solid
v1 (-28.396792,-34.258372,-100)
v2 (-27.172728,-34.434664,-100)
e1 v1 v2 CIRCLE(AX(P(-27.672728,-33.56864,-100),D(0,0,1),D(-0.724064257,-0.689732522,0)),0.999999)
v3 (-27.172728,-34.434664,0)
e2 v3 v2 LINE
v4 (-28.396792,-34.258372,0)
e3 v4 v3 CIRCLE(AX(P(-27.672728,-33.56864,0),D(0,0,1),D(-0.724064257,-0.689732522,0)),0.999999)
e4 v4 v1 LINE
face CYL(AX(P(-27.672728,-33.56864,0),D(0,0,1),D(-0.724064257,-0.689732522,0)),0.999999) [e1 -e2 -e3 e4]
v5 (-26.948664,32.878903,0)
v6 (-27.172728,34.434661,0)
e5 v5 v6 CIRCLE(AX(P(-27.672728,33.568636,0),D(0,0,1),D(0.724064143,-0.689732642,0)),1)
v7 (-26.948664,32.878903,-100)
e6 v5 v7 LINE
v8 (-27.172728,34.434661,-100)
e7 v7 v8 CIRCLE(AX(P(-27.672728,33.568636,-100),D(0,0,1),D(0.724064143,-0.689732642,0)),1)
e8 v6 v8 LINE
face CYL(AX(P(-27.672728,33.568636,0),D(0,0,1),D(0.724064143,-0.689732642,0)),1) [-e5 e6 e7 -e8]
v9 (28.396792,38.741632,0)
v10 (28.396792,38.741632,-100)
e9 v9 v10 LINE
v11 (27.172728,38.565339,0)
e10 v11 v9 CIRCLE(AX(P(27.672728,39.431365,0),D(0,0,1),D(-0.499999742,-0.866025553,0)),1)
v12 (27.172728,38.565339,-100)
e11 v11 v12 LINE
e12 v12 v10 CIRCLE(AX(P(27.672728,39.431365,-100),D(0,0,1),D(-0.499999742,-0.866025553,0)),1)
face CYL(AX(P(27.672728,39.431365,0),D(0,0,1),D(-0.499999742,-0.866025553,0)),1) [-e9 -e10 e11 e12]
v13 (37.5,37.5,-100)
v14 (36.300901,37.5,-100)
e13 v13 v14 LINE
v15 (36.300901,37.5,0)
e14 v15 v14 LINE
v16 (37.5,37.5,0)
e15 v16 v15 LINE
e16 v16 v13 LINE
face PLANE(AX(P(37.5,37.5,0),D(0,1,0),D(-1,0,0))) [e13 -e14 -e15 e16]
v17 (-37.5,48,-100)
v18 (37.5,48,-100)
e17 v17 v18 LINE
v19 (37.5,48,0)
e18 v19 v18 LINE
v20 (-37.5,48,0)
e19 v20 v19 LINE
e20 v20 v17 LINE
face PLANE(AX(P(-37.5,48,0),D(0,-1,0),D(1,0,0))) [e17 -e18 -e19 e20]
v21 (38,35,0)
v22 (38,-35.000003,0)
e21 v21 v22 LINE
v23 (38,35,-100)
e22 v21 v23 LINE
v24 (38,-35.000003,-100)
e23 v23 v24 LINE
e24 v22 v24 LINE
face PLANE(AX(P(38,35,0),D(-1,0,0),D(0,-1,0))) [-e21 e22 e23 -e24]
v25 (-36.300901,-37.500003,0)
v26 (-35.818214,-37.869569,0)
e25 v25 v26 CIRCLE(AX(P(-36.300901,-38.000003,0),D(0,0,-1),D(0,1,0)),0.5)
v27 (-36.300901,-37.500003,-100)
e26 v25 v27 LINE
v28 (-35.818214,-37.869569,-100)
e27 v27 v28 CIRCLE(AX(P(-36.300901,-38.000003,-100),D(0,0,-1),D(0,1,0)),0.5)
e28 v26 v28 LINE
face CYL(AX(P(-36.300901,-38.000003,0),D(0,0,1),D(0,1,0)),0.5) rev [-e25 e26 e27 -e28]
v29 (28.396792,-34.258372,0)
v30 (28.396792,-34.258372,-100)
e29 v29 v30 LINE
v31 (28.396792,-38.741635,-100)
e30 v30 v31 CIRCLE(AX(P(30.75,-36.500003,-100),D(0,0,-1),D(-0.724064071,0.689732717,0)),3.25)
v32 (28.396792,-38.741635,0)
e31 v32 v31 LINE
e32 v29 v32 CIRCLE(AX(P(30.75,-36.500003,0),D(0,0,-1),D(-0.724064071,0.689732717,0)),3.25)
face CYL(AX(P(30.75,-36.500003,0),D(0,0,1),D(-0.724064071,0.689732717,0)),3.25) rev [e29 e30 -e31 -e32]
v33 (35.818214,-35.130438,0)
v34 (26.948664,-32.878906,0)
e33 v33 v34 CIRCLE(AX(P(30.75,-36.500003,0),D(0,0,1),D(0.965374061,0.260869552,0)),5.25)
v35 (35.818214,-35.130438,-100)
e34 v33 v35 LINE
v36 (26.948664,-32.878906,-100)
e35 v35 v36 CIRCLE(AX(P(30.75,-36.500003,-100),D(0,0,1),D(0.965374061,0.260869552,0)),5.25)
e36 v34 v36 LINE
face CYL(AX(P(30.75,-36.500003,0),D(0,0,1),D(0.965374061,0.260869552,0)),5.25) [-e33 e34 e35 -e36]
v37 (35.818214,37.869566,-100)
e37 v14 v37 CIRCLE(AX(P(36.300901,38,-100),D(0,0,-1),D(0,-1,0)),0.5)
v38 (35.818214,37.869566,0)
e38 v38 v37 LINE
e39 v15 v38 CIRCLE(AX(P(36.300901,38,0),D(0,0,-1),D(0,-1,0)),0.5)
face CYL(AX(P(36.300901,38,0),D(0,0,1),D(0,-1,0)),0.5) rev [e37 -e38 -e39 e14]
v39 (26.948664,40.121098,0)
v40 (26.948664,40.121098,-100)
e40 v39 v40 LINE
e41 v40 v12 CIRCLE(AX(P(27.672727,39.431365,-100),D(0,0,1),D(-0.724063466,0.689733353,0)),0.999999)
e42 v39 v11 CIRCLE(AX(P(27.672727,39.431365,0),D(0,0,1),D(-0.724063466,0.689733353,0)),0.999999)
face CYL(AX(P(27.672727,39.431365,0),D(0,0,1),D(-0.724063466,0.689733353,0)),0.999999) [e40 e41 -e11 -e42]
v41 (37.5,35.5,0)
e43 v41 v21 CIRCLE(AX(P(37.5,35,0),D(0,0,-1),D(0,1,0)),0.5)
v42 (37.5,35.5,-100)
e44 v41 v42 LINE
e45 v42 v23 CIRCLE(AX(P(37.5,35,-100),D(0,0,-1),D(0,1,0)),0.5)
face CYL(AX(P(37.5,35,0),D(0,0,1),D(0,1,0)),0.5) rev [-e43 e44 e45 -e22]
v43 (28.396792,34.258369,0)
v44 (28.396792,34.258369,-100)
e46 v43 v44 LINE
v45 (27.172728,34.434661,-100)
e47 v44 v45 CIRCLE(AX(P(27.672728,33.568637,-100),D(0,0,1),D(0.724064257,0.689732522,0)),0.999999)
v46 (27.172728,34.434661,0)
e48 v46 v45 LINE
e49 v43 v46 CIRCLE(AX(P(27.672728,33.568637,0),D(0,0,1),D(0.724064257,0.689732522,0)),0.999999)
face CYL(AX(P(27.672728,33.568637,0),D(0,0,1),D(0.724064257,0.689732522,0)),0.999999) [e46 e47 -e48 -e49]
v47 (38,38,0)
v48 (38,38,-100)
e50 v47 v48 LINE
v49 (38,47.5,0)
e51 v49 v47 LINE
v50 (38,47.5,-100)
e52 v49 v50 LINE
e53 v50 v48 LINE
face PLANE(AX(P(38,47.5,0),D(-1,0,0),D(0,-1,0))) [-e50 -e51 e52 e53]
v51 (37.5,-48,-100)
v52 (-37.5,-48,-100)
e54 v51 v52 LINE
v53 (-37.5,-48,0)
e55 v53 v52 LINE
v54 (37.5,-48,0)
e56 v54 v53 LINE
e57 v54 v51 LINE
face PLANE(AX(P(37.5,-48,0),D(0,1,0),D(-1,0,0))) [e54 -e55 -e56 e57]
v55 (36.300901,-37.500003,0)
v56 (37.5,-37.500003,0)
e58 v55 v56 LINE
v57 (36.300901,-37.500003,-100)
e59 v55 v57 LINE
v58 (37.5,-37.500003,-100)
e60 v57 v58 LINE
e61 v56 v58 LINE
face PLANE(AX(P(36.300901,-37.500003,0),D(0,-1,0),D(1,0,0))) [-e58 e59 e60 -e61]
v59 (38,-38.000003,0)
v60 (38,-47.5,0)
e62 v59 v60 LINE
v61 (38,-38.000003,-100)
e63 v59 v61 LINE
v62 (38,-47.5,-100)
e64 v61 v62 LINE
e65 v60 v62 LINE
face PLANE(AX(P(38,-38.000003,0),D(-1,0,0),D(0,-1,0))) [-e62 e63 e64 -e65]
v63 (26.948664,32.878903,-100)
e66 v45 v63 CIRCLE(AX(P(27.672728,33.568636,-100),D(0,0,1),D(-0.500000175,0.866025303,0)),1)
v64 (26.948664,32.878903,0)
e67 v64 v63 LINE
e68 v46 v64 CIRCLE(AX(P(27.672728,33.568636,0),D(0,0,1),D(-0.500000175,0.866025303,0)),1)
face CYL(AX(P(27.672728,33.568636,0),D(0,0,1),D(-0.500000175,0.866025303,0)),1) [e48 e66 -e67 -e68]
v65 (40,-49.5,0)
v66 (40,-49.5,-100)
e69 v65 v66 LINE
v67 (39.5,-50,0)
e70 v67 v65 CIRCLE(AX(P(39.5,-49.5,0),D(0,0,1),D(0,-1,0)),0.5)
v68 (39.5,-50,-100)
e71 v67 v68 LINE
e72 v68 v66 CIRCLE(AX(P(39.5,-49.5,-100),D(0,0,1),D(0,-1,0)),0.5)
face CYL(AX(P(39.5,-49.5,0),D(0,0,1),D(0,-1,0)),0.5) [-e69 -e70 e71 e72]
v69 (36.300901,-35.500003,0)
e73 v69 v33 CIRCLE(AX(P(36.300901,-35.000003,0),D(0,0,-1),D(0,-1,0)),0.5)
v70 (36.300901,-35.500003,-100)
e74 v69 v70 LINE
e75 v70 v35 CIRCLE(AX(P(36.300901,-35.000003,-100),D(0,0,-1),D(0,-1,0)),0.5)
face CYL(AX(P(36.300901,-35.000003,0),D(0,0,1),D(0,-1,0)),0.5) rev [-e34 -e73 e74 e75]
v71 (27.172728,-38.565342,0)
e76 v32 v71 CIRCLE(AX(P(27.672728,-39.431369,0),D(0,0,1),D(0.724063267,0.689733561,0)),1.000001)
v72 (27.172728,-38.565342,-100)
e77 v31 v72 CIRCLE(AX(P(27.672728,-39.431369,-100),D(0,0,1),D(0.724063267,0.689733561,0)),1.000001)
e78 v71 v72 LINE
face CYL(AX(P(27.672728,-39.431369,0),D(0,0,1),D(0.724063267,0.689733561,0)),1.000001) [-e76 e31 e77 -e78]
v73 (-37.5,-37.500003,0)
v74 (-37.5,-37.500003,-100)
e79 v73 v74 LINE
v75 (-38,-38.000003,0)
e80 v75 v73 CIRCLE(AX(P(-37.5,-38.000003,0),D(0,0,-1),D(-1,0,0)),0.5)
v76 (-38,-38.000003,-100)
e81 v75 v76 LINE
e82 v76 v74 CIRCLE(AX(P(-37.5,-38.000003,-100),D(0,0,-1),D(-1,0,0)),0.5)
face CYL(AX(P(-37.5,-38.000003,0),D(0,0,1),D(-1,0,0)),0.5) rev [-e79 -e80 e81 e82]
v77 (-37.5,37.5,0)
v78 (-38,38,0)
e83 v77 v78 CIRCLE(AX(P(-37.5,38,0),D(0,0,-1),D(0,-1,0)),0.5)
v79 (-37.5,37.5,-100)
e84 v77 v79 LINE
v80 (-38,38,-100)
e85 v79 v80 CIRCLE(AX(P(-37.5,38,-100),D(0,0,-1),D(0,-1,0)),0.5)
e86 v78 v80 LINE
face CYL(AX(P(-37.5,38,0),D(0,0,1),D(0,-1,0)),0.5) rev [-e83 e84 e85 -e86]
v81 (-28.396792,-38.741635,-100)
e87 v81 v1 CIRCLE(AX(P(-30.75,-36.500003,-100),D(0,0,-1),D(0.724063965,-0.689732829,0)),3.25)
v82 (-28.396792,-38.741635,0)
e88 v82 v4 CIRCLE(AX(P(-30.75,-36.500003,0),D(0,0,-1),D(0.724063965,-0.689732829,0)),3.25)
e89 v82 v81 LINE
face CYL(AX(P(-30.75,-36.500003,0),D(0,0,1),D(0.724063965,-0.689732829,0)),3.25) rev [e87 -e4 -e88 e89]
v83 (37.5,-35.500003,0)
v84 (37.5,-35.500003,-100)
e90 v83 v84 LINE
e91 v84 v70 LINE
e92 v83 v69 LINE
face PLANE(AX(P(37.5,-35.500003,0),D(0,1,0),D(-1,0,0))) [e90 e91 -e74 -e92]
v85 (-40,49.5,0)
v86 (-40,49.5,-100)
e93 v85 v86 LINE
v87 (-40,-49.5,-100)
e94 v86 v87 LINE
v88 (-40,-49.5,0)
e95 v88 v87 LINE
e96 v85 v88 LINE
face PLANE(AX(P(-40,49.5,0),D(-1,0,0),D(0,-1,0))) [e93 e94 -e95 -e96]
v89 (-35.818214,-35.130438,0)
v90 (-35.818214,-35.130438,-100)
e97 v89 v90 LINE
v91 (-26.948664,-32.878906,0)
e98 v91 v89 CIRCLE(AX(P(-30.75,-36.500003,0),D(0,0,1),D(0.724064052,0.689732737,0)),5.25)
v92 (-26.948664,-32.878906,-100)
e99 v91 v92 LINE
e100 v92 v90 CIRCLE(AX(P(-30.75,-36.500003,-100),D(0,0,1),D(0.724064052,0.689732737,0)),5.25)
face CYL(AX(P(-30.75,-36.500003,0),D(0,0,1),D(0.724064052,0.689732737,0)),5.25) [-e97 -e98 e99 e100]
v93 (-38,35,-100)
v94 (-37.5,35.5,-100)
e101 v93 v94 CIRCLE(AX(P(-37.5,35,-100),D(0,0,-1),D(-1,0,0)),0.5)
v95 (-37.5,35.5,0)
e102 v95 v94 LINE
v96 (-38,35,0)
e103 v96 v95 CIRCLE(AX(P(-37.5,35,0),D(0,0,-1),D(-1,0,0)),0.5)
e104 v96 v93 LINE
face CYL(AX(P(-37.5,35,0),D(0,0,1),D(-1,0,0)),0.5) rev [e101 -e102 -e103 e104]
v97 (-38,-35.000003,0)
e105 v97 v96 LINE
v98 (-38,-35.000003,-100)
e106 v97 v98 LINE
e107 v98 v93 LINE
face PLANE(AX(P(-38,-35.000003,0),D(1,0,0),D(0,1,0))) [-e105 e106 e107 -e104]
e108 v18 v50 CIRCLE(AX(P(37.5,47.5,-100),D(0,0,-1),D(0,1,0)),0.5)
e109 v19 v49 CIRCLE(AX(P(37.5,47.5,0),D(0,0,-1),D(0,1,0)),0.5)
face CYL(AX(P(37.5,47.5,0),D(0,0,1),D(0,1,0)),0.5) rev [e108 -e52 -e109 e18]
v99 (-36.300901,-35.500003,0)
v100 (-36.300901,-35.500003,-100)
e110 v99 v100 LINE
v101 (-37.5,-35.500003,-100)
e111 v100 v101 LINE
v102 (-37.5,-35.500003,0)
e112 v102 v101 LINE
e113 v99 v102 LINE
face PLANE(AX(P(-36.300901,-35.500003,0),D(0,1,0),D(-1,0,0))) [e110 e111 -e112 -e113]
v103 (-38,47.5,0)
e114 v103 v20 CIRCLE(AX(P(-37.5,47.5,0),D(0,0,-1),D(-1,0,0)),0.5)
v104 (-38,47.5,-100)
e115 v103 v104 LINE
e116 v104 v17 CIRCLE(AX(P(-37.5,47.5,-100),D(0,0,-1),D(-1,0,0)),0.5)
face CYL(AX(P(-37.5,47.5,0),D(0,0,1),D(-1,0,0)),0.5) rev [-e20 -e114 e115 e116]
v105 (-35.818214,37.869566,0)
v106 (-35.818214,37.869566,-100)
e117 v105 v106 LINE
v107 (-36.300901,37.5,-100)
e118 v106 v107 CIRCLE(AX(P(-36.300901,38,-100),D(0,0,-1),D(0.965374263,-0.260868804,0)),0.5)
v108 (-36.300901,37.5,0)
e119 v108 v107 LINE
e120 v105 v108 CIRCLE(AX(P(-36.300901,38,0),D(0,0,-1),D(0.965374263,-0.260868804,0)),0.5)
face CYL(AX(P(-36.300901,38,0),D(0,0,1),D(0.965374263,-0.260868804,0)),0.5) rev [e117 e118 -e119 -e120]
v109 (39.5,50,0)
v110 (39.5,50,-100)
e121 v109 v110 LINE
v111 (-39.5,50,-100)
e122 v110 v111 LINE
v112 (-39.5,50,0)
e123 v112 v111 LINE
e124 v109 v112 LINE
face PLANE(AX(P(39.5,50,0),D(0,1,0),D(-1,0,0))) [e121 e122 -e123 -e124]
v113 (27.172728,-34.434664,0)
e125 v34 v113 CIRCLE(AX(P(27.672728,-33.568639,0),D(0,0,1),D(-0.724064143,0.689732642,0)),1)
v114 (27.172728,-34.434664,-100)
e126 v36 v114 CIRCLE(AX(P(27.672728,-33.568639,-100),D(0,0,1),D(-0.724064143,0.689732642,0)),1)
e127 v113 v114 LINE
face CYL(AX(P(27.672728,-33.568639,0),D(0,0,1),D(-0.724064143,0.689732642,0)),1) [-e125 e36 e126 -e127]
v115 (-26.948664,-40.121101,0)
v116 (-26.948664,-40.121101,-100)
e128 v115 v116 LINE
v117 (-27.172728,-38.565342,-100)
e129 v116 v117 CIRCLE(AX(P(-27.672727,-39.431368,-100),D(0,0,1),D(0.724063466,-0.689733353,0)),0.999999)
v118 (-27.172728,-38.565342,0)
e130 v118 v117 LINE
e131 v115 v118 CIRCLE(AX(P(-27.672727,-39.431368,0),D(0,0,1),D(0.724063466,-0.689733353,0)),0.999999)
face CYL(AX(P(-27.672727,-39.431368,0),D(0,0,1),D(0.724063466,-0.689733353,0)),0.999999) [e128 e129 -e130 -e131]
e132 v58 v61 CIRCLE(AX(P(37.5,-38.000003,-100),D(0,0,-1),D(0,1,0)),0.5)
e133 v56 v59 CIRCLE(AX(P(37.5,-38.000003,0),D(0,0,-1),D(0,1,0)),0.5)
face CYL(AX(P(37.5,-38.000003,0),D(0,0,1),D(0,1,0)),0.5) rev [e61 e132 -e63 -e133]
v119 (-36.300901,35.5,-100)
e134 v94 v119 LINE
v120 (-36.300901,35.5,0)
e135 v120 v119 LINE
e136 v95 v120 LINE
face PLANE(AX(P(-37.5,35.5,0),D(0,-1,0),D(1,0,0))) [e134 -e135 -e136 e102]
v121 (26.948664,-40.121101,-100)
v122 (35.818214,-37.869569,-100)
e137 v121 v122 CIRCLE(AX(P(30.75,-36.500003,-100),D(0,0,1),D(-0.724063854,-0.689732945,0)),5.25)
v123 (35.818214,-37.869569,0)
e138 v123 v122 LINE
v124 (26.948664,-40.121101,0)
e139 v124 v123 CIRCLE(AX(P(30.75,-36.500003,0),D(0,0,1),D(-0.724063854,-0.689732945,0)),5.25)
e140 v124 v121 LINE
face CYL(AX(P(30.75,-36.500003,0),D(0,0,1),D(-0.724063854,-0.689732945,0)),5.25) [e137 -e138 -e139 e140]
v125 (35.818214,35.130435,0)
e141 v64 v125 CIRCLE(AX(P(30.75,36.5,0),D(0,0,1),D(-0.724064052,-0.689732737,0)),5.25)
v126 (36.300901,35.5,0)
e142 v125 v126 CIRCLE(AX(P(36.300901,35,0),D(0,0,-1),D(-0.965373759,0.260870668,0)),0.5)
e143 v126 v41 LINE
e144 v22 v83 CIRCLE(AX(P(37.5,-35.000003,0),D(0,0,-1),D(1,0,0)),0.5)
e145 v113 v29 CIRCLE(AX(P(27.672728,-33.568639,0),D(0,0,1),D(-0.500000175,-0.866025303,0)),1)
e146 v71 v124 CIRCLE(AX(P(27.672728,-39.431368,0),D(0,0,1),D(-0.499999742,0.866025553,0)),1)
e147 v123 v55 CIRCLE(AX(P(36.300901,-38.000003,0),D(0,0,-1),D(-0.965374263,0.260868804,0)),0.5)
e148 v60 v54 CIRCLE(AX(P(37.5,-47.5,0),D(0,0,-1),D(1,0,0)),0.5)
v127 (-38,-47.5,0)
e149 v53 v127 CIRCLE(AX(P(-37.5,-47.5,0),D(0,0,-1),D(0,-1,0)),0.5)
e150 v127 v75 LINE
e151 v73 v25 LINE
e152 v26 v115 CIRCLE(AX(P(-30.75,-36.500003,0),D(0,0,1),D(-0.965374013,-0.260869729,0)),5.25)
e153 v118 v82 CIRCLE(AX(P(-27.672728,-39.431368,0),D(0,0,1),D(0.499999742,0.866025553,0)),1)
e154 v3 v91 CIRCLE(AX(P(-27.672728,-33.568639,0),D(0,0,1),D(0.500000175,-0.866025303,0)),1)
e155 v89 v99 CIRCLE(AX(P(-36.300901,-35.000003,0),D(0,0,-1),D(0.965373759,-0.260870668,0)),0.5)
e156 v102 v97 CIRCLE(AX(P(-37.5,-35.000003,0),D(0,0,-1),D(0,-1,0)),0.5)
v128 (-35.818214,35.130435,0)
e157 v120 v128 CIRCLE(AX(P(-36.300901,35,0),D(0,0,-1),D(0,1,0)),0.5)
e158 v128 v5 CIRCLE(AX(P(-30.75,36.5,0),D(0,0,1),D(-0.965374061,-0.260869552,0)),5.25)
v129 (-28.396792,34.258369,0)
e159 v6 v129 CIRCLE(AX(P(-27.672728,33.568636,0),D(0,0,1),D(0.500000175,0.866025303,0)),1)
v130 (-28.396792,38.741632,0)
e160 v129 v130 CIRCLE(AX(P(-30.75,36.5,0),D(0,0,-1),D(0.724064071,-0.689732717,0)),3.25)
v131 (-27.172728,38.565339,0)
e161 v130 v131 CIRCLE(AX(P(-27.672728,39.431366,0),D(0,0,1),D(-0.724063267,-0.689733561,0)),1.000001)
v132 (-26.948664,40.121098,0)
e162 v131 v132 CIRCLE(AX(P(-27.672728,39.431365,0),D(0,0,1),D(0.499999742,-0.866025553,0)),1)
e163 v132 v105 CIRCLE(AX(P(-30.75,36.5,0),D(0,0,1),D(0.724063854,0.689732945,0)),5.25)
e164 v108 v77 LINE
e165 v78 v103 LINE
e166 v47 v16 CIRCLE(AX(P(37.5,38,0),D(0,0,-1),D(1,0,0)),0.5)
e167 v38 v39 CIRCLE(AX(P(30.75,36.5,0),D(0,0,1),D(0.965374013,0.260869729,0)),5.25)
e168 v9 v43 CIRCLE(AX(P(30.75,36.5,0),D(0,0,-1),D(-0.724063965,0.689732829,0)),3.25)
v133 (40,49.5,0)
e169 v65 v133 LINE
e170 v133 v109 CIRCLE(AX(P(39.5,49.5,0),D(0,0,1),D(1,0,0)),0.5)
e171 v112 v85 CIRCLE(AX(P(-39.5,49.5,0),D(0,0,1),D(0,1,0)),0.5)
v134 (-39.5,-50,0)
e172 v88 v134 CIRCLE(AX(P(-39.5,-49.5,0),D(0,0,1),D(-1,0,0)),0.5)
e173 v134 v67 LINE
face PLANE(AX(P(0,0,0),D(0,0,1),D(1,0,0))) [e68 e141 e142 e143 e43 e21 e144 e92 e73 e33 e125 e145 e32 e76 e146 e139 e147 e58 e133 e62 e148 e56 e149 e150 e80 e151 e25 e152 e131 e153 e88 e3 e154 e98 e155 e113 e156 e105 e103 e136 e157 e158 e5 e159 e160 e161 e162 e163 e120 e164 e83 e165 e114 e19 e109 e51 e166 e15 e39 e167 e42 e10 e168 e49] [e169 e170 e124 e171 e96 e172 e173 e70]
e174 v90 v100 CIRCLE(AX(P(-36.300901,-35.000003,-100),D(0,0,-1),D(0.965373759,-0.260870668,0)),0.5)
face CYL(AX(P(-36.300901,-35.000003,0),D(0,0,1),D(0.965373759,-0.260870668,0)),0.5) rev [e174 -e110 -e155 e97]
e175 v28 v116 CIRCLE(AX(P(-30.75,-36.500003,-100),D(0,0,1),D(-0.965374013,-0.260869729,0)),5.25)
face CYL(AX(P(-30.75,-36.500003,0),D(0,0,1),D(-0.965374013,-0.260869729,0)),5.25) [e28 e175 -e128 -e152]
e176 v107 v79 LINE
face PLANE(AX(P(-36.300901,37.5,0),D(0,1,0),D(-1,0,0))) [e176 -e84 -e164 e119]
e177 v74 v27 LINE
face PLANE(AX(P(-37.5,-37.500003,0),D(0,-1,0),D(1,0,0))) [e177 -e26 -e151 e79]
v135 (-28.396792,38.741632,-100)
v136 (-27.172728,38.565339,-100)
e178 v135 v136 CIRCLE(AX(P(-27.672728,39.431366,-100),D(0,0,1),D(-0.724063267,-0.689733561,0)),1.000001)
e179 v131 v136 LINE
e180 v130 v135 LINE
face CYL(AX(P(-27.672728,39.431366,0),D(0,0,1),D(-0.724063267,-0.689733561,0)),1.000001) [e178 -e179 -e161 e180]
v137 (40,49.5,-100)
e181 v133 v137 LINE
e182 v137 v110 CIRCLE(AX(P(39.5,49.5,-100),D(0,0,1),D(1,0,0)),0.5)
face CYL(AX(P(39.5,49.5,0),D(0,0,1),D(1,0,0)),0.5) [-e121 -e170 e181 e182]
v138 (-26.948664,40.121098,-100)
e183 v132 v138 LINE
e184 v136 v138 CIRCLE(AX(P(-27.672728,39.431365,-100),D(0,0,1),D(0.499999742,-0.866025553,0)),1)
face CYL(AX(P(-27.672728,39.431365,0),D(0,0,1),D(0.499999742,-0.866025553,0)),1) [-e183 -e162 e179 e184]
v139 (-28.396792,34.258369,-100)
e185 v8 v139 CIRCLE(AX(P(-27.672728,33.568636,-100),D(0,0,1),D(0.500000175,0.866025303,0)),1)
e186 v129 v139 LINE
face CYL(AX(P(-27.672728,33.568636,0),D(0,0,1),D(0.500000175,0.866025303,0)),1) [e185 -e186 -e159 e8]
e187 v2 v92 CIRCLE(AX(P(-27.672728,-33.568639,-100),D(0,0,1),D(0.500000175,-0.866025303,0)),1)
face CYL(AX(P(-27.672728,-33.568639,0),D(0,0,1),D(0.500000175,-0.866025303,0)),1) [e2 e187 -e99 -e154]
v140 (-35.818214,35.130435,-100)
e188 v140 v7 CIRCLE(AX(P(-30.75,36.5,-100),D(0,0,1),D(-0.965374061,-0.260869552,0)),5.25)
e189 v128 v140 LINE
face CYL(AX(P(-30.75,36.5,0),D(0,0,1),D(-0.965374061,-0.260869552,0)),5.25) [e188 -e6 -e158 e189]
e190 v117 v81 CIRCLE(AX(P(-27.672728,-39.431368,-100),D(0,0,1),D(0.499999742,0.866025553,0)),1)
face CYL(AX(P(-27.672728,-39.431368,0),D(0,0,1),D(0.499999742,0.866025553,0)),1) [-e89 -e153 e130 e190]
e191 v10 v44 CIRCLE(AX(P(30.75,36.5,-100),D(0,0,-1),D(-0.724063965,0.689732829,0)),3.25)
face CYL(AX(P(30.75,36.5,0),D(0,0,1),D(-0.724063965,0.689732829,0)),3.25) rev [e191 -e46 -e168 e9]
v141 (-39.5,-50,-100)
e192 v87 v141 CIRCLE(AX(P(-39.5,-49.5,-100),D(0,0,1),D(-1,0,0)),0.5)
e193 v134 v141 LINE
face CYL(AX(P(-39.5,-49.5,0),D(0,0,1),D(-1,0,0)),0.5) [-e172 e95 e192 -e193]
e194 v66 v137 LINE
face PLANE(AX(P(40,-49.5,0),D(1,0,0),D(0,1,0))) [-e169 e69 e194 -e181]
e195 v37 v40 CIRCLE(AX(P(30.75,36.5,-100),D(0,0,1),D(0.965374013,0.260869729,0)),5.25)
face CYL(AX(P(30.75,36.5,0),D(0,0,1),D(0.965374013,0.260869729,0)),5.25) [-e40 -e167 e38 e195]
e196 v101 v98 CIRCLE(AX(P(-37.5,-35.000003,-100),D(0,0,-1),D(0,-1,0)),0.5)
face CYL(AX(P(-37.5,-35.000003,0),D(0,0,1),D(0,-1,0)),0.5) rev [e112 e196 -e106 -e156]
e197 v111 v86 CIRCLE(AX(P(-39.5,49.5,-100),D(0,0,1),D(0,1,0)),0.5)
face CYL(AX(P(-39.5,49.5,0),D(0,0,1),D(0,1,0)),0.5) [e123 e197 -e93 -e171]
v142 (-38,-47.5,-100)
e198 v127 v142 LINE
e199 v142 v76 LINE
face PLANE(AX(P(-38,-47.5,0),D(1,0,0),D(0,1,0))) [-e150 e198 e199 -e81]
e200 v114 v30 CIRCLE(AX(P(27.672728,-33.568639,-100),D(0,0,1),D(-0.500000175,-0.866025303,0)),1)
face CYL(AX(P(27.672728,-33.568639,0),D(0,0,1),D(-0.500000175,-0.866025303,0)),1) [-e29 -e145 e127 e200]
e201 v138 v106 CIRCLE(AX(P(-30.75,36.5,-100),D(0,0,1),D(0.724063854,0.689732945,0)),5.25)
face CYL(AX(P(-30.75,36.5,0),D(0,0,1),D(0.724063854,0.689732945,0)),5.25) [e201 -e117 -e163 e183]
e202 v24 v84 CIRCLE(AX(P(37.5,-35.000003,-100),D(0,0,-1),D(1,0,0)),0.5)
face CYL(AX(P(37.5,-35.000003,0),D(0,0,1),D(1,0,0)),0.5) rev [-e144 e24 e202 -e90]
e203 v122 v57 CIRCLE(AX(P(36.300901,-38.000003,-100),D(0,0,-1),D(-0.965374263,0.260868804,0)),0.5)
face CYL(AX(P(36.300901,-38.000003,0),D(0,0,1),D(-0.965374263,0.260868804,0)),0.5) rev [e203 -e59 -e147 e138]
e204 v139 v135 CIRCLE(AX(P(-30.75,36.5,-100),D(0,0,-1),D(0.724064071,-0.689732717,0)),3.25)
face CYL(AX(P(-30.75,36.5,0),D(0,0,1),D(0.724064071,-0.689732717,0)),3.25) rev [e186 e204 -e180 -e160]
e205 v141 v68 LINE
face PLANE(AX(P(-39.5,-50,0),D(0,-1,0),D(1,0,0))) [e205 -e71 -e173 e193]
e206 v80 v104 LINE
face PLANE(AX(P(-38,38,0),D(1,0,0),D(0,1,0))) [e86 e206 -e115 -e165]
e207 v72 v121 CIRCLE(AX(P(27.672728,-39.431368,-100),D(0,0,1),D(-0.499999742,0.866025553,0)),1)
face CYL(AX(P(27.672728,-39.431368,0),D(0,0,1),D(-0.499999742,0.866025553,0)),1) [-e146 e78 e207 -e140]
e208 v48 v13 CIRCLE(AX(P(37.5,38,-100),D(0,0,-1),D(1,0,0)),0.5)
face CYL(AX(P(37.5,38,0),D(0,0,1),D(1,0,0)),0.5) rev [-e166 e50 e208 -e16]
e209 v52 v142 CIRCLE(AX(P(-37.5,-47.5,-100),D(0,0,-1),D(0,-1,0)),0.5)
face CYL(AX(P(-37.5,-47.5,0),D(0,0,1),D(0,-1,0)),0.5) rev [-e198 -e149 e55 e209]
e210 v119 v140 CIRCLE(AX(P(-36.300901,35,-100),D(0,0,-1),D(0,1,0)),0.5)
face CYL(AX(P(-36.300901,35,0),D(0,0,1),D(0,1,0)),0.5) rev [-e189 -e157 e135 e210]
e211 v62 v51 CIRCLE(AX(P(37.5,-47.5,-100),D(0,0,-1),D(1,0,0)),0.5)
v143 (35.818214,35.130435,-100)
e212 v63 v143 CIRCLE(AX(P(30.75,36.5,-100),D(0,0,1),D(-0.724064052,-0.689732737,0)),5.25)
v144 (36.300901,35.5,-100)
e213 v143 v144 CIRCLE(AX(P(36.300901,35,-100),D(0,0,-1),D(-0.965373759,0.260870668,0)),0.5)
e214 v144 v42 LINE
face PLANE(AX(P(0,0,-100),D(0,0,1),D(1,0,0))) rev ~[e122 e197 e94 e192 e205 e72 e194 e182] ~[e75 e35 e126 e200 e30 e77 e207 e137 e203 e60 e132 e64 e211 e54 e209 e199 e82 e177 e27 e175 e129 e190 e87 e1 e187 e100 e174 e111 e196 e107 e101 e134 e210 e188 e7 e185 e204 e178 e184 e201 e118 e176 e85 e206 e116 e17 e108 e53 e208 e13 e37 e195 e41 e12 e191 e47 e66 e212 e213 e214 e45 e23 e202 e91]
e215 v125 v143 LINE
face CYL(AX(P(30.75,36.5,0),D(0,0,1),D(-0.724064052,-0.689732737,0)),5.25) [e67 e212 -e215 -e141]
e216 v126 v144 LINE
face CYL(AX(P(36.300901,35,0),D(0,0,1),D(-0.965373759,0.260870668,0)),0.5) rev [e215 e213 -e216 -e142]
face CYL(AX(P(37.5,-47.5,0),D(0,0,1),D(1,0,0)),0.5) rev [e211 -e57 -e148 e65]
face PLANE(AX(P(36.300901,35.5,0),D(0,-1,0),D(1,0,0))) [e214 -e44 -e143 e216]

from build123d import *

# Parameters (mm, degrees)
F1_DEPTH = 100


# Not quite as in the source:
# - ends of sketch curves that miss each other by under 0.0002 mm in the source are joined


with BuildPart() as f1:
    # F0 (on Top) → F1 (new body)
    with BuildSketch(Plane.XY):
        with BuildLine():
            Line((40, -49.5), (40, 49.5))
            ThreePointArc((40, 49.5), (39.8535533906, 49.8535533906), (39.5, 50))
            Line((39.5, 50), (-39.5, 50))
            ThreePointArc((-39.5, 50), (-39.8535533906, 49.8535533906), (-40, 49.5))
            Line((-40, 49.5), (-40, -49.5))
            ThreePointArc((-40, -49.5), (-39.8535533906, -49.8535533906), (-39.5, -50))
            Line((-39.5, -50), (39.5, -50))
            ThreePointArc((39.5, -50), (39.8535533906, -49.8535533906), (40, -49.5))
        make_face()
        with BuildLine():
            ThreePointArc((37.5, 48), (37.8535533906, 47.8535533906), (38, 47.5))
            Line((38, 47.5), (38, 38))
            ThreePointArc((38, 38), (37.8535533906, 37.6464466094), (37.5, 37.5))
            Line((37.5, 37.5), (36.300901, 37.5))
            ThreePointArc((36.300901, 37.5), (35.9969413236, 37.6030006107), (35.8182137763, 37.8695659396))
            ThreePointArc((35.8182137763, 37.8695659396), (32.0417405862, 41.5886055318), (26.9486644214, 40.1210975986))
            ThreePointArc((26.9486644214, 40.1210975986), (26.6829406294, 39.2888133915), (27.1727282582, 38.5653394472))
            ThreePointArc((27.1727282582, 38.5653394472), (27.8152796085, 38.4415776294), (28.396791896, 38.7416320991))
            ThreePointArc((28.396791896, 38.7416320991), (34, 36.499999638), (28.3967917139, 34.2583687274))
            ThreePointArc((28.3967917139, 34.2583687274), (27.815279361, 34.5584234062), (27.1727278252, 34.4346613028))
            ThreePointArc((27.1727278252, 34.4346613028), (26.6829405938, 33.711187361), (26.948664104, 32.8789030991))
            ThreePointArc((26.948664104, 32.8789030991), (32.0417407031, 31.4113944979), (35.8182138677, 35.1304350358))
            ThreePointArc((35.8182138677, 35.1304350358), (35.9969417068, 35.3969996827), (36.300901, 35.5))
            Line((36.300901, 35.5), (37.5, 35.5))
            ThreePointArc((37.5, 35.5), (37.8535533906, 35.3535533906), (38, 35))
            Line((38, 35), (38, -35.000003))
            ThreePointArc((38, -35.000003), (37.8535533906, -35.3535563906), (37.5, -35.500003))
            Line((37.5, -35.500003), (36.300901, -35.500003))
            ThreePointArc((36.300901, -35.500003), (35.9969417068, -35.3970026827), (35.8182140282, -35.1304379924))
            ThreePointArc((35.8182140282, -35.1304379924), (32.0417407032, -31.4113974979), (26.948663922, -32.8789059257))
            ThreePointArc((26.948663922, -32.8789059257), (26.6829405938, -33.711190361), (27.1727278252, -34.4346643028))
            ThreePointArc((27.1727278252, -34.4346643028), (27.815279361, -34.5584264062), (28.396791896, -34.2583719009))
            ThreePointArc((28.396791896, -34.2583719009), (34, -36.500002638), (28.3967922133, -38.7416347968))
            ThreePointArc((28.3967922133, -38.7416347968), (27.8152796085, -38.4415806294), (27.1727282582, -38.5653424472))
            ThreePointArc((27.1727282582, -38.5653424472), (26.6829406294, -39.2888163915), (26.948664104, -40.1211009009))
            ThreePointArc((26.948664104, -40.1211009009), (32.0417405862, -41.5886085318), (35.8182136159, -37.8695688962))
            ThreePointArc((35.8182136159, -37.8695688962), (35.9969413236, -37.6030036107), (36.300901, -37.500003))
            Line((36.300901, -37.500003), (37.5, -37.500003))
            ThreePointArc((37.5, -37.500003), (37.8535533906, -37.6464496094), (38, -38.000003))
            Line((38, -38.000003), (38, -47.5))
            ThreePointArc((38, -47.5), (37.8535533906, -47.8535533906), (37.5, -48))
            Line((37.5, -48), (-37.5, -48))
            ThreePointArc((-37.5, -48), (-37.8535533906, -47.8535533906), (-38, -47.5))
            Line((-38, -47.5), (-38, -38.000003))
            ThreePointArc((-38, -38.000003), (-37.8535533906, -37.6464496094), (-37.5, -37.500003))
            Line((-37.5, -37.500003), (-36.300901, -37.500003))
            ThreePointArc((-36.300901, -37.500003), (-35.9969413236, -37.6030036107), (-35.8182137763, -37.8695689396))
            ThreePointArc((-35.8182137763, -37.8695689396), (-32.0417405862, -41.5886085318), (-26.9486644214, -40.1211005986))
            ThreePointArc((-26.9486644214, -40.1211005986), (-26.6829406294, -39.2888163915), (-27.1727282582, -38.5653424472))
            ThreePointArc((-27.1727282582, -38.5653424472), (-27.8152796085, -38.4415806294), (-28.396791896, -38.7416350991))
            ThreePointArc((-28.396791896, -38.7416350991), (-34, -36.500002638), (-28.3967917139, -34.2583717274))
            ThreePointArc((-28.3967917139, -34.2583717274), (-27.815279361, -34.5584264062), (-27.1727278252, -34.4346643028))
            ThreePointArc((-27.1727278252, -34.4346643028), (-26.6829405938, -33.711190361), (-26.948664104, -32.8789060991))
            ThreePointArc((-26.948664104, -32.8789060991), (-32.0417407032, -31.4113974979), (-35.8182138677, -35.1304380358))
            ThreePointArc((-35.8182138677, -35.1304380358), (-35.9969417068, -35.3970026827), (-36.300901, -35.500003))
            Line((-36.300901, -35.500003), (-37.5, -35.500003))
            ThreePointArc((-37.5, -35.500003), (-37.8535533906, -35.3535563906), (-38, -35.000003))
            Line((-38, -35.000003), (-38, 35))
            ThreePointArc((-38, 35), (-37.8535533906, 35.3535533906), (-37.5, 35.5))
            Line((-37.5, 35.5), (-36.300901, 35.5))
            ThreePointArc((-36.300901, 35.5), (-35.9969417068, 35.3969996827), (-35.8182140282, 35.1304349924))
            ThreePointArc((-35.8182140282, 35.1304349924), (-32.0417407031, 31.4113944979), (-26.948663922, 32.8789029257))
            ThreePointArc((-26.948663922, 32.8789029257), (-26.6829405938, 33.711187361), (-27.1727278252, 34.4346613028))
            ThreePointArc((-27.1727278252, 34.4346613028), (-27.815279361, 34.5584234062), (-28.396791896, 34.2583689009))
            ThreePointArc((-28.396791896, 34.2583689009), (-34, 36.499999638), (-28.3967922133, 38.7416317968))
            ThreePointArc((-28.3967922133, 38.7416317968), (-27.8152796085, 38.4415776294), (-27.1727282582, 38.5653394472))
            ThreePointArc((-27.1727282582, 38.5653394472), (-26.6829406294, 39.2888133915), (-26.948664104, 40.1210979009))
            ThreePointArc((-26.948664104, 40.1210979009), (-32.0417405862, 41.5886055318), (-35.8182136159, 37.8695658962))
            ThreePointArc((-35.8182136159, 37.8695658962), (-35.9969413236, 37.6030006107), (-36.300901, 37.5))
            Line((-36.300901, 37.5), (-37.5, 37.5))
            ThreePointArc((-37.5, 37.5), (-37.8535533906, 37.6464466094), (-38, 38))
            Line((-38, 38), (-38, 47.5))
            ThreePointArc((-38, 47.5), (-37.8535533906, 47.8535533906), (-37.5, 48))
            Line((-37.5, 48), (37.5, 48))
        make_face(mode=Mode.SUBTRACT)
    extrude(amount=-F1_DEPTH)


solid = f1.part
